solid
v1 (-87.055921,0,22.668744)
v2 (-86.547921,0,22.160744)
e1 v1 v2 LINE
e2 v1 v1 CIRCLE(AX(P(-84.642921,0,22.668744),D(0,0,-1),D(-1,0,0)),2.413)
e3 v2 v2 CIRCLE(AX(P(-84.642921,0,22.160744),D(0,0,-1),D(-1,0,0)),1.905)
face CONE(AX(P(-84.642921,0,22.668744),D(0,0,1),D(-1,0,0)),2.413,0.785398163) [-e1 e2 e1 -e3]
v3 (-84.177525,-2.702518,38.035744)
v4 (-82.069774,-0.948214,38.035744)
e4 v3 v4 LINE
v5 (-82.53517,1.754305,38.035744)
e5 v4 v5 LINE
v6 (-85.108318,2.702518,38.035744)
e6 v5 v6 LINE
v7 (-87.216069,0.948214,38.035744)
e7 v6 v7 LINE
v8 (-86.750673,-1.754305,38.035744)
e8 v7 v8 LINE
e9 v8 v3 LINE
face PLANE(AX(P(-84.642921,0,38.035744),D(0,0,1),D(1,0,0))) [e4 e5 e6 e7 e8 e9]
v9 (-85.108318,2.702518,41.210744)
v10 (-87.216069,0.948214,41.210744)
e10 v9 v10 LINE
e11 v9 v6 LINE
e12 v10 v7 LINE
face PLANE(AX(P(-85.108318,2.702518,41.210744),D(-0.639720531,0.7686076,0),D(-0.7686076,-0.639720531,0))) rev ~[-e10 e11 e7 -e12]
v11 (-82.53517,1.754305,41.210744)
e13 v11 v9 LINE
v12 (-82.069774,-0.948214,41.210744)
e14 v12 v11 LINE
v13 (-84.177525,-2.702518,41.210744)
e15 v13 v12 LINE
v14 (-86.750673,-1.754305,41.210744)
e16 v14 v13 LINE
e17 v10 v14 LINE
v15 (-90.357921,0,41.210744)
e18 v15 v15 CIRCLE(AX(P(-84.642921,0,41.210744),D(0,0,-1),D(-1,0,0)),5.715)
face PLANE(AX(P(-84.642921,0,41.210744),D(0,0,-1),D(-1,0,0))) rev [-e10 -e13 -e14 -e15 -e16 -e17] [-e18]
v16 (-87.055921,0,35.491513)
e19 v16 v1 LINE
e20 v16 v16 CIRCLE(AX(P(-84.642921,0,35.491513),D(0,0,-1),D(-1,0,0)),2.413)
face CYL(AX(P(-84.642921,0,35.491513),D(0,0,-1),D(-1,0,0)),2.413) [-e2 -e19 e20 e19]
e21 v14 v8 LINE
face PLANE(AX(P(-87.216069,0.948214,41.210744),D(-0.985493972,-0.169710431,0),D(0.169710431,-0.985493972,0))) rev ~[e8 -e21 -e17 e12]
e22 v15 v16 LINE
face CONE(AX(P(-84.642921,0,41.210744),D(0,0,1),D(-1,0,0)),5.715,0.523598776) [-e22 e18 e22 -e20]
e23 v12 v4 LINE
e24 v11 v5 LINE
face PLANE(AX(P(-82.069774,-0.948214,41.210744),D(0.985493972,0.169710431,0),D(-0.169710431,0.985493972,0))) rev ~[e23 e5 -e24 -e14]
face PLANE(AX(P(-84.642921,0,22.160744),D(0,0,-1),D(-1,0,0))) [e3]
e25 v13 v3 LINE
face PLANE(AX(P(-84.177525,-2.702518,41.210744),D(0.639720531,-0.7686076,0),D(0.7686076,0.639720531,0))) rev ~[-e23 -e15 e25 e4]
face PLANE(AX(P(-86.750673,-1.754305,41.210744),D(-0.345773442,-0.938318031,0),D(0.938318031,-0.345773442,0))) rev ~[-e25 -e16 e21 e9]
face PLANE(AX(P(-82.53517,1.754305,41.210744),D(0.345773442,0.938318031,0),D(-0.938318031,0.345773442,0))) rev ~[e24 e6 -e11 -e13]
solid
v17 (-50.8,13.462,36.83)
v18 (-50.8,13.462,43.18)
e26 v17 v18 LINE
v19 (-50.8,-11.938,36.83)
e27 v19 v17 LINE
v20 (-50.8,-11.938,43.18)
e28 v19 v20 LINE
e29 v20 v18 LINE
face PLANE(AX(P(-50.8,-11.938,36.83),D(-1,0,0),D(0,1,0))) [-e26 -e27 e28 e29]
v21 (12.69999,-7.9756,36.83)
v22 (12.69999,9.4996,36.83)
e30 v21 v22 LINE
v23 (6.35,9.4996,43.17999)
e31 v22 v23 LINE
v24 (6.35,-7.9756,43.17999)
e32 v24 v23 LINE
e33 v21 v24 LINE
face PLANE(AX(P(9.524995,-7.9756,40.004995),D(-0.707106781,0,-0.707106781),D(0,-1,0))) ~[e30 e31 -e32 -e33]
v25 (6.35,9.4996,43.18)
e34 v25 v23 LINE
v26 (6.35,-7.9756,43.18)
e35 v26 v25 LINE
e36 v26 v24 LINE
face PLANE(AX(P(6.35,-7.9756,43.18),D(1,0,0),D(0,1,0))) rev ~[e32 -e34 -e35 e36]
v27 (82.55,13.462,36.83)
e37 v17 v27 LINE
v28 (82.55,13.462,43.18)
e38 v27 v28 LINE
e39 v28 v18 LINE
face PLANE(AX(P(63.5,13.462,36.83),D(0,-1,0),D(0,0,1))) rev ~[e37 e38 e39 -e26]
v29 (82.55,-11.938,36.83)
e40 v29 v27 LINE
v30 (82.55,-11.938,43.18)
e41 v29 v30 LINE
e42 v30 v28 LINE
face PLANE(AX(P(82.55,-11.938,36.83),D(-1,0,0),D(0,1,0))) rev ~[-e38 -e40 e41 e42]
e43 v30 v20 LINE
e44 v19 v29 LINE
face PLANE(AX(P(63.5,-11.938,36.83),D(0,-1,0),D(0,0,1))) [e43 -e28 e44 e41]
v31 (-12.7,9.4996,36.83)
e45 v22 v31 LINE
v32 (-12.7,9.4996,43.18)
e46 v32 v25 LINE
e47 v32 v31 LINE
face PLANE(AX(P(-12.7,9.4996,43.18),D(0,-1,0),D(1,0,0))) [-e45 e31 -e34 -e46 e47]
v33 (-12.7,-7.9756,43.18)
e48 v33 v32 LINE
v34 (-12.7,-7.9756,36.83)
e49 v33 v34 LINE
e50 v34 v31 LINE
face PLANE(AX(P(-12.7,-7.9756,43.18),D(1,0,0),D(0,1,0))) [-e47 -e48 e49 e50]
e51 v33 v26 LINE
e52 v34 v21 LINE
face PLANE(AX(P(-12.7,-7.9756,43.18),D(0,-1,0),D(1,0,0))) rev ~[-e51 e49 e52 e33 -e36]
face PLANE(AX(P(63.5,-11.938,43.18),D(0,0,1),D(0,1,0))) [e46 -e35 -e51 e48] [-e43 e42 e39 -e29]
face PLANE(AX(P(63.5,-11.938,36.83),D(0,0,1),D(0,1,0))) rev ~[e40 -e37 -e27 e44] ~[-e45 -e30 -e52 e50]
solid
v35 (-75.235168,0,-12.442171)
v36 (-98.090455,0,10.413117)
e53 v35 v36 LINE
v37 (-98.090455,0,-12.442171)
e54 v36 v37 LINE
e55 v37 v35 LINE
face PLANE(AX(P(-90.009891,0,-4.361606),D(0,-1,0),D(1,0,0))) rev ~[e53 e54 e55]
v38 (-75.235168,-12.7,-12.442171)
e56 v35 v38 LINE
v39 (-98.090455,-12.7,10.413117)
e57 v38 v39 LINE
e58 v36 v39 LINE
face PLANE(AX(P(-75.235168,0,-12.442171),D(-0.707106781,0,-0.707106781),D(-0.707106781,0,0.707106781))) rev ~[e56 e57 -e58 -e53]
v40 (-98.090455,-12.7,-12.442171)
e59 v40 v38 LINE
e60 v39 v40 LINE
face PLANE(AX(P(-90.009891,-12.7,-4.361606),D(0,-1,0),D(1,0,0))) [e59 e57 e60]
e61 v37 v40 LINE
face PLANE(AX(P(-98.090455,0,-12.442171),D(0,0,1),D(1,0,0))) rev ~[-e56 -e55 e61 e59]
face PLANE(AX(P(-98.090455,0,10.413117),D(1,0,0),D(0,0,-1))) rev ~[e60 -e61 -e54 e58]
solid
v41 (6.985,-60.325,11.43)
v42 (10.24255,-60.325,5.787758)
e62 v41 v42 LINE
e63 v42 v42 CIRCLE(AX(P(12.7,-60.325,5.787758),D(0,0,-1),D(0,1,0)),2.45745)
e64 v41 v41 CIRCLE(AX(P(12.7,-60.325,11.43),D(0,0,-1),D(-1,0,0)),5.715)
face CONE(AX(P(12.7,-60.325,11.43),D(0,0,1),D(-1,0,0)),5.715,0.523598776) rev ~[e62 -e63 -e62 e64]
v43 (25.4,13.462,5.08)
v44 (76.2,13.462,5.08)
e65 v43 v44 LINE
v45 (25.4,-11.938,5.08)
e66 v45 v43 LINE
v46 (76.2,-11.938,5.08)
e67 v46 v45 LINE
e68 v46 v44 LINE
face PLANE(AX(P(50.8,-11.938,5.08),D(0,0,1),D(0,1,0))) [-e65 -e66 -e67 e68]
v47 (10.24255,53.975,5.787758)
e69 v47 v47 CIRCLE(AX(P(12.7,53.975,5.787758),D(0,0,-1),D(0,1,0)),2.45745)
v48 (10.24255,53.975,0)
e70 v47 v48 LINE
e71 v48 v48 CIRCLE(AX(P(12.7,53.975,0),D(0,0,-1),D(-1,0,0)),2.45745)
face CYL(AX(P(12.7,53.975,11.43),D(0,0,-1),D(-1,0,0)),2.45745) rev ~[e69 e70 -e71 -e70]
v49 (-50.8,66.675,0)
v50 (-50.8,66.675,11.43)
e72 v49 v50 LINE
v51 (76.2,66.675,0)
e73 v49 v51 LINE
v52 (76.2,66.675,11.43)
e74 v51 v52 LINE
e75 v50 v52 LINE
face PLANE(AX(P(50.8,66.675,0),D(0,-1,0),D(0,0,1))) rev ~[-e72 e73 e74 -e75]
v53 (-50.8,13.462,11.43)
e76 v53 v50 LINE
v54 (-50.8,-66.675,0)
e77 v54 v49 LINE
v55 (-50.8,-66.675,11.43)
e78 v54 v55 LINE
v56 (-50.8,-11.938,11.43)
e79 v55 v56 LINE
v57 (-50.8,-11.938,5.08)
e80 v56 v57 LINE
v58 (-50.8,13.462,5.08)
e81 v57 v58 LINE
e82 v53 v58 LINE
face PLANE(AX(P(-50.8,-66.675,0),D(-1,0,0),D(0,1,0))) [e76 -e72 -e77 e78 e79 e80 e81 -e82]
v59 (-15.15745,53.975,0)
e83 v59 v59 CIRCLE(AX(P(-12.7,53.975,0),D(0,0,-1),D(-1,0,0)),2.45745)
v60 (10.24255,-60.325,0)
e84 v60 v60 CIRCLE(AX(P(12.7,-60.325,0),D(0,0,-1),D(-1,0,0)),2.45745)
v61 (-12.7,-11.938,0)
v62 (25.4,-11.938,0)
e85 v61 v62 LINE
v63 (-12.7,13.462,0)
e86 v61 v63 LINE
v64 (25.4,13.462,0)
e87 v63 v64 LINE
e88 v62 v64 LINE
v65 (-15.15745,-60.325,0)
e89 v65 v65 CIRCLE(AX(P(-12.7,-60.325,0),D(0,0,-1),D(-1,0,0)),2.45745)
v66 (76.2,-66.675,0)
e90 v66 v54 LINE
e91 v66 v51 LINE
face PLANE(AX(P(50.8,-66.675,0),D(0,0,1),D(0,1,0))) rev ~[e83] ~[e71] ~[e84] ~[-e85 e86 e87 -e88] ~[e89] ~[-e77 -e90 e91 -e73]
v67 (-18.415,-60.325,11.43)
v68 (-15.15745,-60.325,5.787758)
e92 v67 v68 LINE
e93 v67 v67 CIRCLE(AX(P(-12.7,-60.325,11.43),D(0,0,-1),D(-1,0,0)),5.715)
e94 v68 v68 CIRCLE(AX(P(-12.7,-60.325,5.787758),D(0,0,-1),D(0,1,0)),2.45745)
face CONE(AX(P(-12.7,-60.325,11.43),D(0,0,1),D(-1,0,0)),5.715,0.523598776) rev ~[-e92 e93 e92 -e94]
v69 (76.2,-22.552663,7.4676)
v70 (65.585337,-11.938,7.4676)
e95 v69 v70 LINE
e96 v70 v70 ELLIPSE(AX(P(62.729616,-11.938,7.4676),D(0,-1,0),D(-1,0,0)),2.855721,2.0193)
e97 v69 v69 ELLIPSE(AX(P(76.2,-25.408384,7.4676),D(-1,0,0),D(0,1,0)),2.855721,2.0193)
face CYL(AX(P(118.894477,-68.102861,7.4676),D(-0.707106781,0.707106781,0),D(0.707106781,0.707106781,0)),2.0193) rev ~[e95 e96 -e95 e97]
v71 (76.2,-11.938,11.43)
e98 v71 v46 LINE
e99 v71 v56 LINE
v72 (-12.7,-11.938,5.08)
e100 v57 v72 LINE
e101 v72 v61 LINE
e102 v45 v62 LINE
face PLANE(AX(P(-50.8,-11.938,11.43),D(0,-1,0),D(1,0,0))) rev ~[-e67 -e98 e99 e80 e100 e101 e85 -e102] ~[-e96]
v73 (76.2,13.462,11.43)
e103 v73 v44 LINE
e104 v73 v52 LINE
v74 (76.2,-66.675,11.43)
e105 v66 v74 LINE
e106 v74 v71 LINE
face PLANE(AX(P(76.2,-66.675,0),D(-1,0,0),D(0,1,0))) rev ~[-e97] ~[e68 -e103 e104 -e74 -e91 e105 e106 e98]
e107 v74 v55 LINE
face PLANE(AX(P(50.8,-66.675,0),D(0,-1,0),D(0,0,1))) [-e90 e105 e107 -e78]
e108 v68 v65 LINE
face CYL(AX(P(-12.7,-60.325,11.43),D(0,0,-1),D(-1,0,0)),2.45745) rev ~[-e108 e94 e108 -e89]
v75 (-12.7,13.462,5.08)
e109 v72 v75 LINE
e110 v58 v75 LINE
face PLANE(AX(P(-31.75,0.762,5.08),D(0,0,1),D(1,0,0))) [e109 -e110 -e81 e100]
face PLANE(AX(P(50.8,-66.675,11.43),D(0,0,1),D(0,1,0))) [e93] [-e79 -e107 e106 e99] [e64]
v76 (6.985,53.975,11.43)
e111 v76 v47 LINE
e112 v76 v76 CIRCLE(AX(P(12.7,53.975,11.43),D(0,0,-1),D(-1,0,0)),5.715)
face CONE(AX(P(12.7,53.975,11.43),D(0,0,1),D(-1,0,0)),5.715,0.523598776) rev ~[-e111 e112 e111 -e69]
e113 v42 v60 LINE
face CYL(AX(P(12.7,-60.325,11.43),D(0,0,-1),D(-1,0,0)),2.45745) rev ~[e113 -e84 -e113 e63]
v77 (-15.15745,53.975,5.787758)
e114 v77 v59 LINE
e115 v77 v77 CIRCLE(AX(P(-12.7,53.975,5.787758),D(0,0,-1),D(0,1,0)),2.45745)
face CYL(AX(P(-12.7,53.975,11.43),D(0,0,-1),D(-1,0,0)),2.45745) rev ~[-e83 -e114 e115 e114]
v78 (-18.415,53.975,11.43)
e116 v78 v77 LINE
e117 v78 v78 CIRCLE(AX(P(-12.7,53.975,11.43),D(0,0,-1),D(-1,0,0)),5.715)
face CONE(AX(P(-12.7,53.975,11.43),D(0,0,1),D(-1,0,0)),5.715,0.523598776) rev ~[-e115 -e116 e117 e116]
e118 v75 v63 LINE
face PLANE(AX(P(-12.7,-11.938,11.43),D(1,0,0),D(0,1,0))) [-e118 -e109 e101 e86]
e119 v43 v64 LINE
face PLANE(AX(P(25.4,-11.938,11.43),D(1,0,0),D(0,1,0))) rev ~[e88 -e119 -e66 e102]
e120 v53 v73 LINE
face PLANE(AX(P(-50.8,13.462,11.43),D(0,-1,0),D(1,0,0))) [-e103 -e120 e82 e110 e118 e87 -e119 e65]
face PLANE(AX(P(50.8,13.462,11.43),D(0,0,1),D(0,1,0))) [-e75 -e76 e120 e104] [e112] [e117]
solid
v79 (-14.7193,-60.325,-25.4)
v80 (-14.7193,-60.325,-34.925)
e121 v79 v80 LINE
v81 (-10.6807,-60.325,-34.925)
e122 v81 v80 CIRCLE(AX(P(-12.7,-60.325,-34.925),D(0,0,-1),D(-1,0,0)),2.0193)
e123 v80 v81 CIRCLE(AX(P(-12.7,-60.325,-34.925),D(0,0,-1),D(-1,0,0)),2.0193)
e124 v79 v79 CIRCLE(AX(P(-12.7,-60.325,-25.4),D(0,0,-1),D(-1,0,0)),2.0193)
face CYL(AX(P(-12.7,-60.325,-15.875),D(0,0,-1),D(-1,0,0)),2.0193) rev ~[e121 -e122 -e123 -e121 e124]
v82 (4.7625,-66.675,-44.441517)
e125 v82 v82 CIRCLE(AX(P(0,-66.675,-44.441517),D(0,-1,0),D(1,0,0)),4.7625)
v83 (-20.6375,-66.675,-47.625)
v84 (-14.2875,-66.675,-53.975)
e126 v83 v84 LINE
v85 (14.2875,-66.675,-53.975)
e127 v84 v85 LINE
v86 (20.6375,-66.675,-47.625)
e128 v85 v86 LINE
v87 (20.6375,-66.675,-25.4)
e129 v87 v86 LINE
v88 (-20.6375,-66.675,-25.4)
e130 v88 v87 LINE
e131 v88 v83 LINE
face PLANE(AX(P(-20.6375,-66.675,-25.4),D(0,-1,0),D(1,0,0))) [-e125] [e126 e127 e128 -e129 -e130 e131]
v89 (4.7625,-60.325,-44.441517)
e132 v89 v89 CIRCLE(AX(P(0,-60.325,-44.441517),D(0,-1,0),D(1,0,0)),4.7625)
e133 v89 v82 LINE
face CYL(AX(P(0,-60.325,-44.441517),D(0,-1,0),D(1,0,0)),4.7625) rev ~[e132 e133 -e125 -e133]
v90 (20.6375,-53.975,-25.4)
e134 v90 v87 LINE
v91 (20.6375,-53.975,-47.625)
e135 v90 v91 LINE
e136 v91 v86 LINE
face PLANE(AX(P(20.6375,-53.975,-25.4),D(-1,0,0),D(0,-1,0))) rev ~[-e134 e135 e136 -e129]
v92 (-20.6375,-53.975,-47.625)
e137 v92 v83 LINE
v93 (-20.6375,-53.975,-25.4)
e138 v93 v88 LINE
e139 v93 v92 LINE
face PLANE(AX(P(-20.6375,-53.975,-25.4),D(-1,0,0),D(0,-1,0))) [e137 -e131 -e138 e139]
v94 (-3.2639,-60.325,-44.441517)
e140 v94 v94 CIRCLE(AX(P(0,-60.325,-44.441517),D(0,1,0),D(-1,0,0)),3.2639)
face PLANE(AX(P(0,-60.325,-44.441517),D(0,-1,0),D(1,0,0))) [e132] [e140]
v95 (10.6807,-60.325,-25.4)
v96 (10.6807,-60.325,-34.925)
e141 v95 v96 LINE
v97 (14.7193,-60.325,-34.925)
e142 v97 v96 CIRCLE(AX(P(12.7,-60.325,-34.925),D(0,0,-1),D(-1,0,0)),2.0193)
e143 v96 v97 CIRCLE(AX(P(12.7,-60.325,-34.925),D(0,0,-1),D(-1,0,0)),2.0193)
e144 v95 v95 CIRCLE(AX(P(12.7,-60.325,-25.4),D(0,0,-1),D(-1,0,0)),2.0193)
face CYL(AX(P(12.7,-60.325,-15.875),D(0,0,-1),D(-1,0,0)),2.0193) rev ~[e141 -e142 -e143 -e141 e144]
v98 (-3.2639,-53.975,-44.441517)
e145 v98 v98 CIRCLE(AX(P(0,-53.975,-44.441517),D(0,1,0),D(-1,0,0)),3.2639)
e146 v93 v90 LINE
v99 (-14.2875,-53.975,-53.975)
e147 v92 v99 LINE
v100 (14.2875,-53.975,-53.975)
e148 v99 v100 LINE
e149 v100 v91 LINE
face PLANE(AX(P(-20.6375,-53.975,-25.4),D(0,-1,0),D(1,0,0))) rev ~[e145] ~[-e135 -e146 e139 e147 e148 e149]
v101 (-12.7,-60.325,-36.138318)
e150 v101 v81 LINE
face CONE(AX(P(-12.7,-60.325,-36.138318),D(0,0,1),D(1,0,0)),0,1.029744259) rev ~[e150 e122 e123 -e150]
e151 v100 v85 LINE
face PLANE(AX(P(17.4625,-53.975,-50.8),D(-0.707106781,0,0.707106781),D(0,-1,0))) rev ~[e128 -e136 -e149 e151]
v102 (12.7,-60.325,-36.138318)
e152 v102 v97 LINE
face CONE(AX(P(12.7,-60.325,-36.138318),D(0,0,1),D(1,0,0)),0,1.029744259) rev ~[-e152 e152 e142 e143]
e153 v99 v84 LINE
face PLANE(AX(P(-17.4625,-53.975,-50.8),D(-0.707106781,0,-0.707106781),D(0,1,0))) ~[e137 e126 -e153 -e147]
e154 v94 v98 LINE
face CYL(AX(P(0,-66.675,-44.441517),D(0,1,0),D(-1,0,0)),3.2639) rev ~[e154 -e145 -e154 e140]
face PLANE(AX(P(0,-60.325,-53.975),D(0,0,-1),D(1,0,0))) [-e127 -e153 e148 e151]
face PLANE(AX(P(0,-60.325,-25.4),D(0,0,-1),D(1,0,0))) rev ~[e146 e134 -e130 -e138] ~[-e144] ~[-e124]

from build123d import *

# Parameters (mm, degrees)
F0_W            = 101.6
F0_H            = 133.35
F1_DEPTH        = 11.43
F3_D            = 4.9149
F3_CSINK_D      = 11.43
F3_CSINK_ANGLE  = 60
F5_W            = 41.275
F5_H            = 12.7
F6_DEPTH        = 28.575
F8_D            = 4.0386
F8_DEPTH        = 9.525
F8_TIP          = 1.213317848
F10_D           = 6.5278
F10_CBORE_D     = 9.525
F10_CBORE_DEPTH = 6.35
F11_W           = 38.1
F11_H           = 25.4
F11_W_2         = 25.4
F12_DEPTH       = 6.35
F13_DEPTH       = 65.406
F15_W           = 101.6
F15_H           = 25.4
F16_DEPTH       = 6.35
F17_W           = 19.05
F17_H           = 17.4752
F18_DEPTH       = 97.156
F20_DEPTH       = 12.7
F21_SIZE2       = 6.34999
F21_SIZE        = 6.34999
F22_DEPTH       = 12.7
F23_DEPTH       = 25.4
F24_DEPTH       = 19.05
F25_SIZE        = 6.35
F28_D           = 4.0386
F28_DEPTH       = 25.4
F28_START       = 31.1992039
F28_TIP         = 1.213317848
F31_SIZE        = 0.508
F33_DEPTH       = 3.175


# Not quite as in the source:
# - a fillet or chamfer is up to 0.001 mm smaller than in the source, because OpenCascade refuses the exact size


with BuildPart() as f1:
    # F0 (on Top) → F1 (new body)
    with BuildSketch(Plane.XY):
        Rectangle(F0_W, F0_H)
    extrude(amount=F1_DEPTH)

    # F3 (through all)
    with Locations(Plane.XY.offset(11.43)):
        with Locations((-12.7, 53.975), (12.7, 53.975), (-12.7, -60.325), (12.7, -60.325)):
            CounterSinkHole(F3_D / 2, F3_CSINK_D / 2, counter_sink_angle=F3_CSINK_ANGLE)

    # F11 (on face) → F12 (cut)
    with BuildSketch(Plane.XY.offset(11.43)):
        with Locations((-31.75, 0.762)):
            Rectangle(F11_W, F11_H)
        with Locations((38.1, 0.762)):
            Rectangle(F11_W_2, F11_H)
    extrude(amount=-F12_DEPTH, mode=Mode.SUBTRACT)

    # F11 (on face) → F13 (cut, through all)
    with BuildSketch(Plane.XY.offset(11.43)):
        with Locations((6.35, 0.762)):
            Rectangle(F11_W, F11_H)
    extrude(amount=-F13_DEPTH, mode=Mode.SUBTRACT)

    # F23 (add): a face of the model
    f23_faces = [f1.faces().sort_by_distance(p)[0] for p in [
        (50.8, 0, 1.338389607),
    ]]
    extrude(f23_faces, amount=F23_DEPTH)

    # F28
    # its depths count from where the whole tool has entered the part; down to there all is cleared
    with Locations(Plane(origin=(71.4375, -71.4375, 0), x_dir=(-0.7071067812, -0.7071067812, 0), z_dir=(0.7071067812, -0.7071067812, 0))):
        with Locations((-35.9150959726, -7.4676)):
            Hole(F28_D / 2, depth=F28_START)
    with Locations(Plane(origin=(71.4375, -71.4375, 0), x_dir=(-0.7071067812, -0.7071067812, 0), z_dir=(0.7071067812, -0.7071067812, 0)).offset(-F28_START)):
        with Locations((-35.9150959726, -7.4676)):
            Hole(F28_D / 2, depth=F28_DEPTH)
            with Locations((0, 0, -(F28_DEPTH + F28_TIP / 2))):  # 118° drill point
                Cone(0, F28_D / 2, F28_TIP, mode=Mode.SUBTRACT)


with BuildPart() as f6:
    # F5 (on offset) → F6 (new body)
    with BuildSketch(Plane(origin=(0, 0, -25.4), x_dir=(1, 0, 0), z_dir=(0, 0, -1))):
        with Locations((0, 60.325)):
            Rectangle(F5_W, F5_H)
    extrude(amount=F6_DEPTH)

    # F8
    with Locations(Plane.XY.offset(-25.4)):
        with Locations((-12.7, -60.325), (12.7, -60.325)):
            Hole(F8_D / 2, depth=F8_DEPTH)
            with Locations((0, 0, -(F8_DEPTH + F8_TIP / 2))):  # 118° drill point
                Cone(0, F8_D / 2, F8_TIP, mode=Mode.SUBTRACT)

    # F10 (through all)
    with Locations(Plane.XZ.offset(66.675)):
        with Locations((0, -44.4415174425)):
            CounterBoreHole(F10_D / 2, F10_CBORE_D / 2, F10_CBORE_DEPTH)

    # F25
    f25_edges = [f6.edges().sort_by_distance(p)[0] for p in [
        (-20.6375, -60.325, -53.975),
        (20.6375, -60.325, -53.975),
    ]]
    chamfer(f25_edges, length=F25_SIZE)


with BuildPart() as f16:
    # F15 (on offset) → F16 (new body)
    with BuildSketch(Plane.XY.offset(36.83)):
        with Locations((0, 0.762)):
            Rectangle(F15_W, F15_H)
    extrude(amount=F16_DEPTH)

    # F17 (on face) → F18 (cut, through all)
    with BuildSketch(Plane.XY.offset(43.18)):
        with Locations((-3.175, 0.762)):
            Rectangle(F17_W, F17_H)
    extrude(amount=-F18_DEPTH, mode=Mode.SUBTRACT)

    # F21 (size 6.35 and 6.35 in the source; OpenCascade refuses exactly that, so slightly less here)
    f21_edges = [f16.edges().sort_by_distance(p)[0] for p in [
        (6.35, 0.762, 36.83),
    ]]
    chamfer(f21_edges, length=F21_SIZE, length2=F21_SIZE2)

    # F22 (add): a face of the model
    f22_faces = [f16.faces().sort_by_distance(p)[0] for p in [
        (50.8, 0.762, 40.005),
    ]]
    extrude(f22_faces, amount=F22_DEPTH)

    # F24 (add): a face of the model
    f24_faces = [f16.faces().sort_by_distance(p)[0] for p in [
        (63.5, 0.762, 40.005),
    ]]
    extrude(f24_faces, amount=F24_DEPTH)


with BuildPart() as f20:
    # F19 (on Front) → F20 (new body)
    with BuildSketch(Plane.XZ):
        Polygon((-75.2351675029, -12.4421706577), (-98.090454936, 10.4131167755), (-98.090454936, -12.4421706577), align=None)
    extrude(amount=F20_DEPTH)


with BuildPart() as f30:
    # F29 (on Front) → F30 (revolve)
    with BuildSketch(Plane.XZ):
        Polygon((-84.6429214931, 41.2107444957), (-90.3579214931, 41.2107444957), (-87.0559214931, 35.4915127291), (-87.0559214931, 22.1607444957), (-84.6429214931, 22.1607444957), align=None)
    revolve(axis=Axis((-84.6429214931, 0, 31.6857444957), (0, 0, -1)))

    # F31
    f31_edges = [f30.edges().sort_by_distance(p)[0] for p in [
        (-82.229921, 0, 22.160744),
    ]]
    chamfer(f31_edges, length=F31_SIZE)

    # F32 (on face) → F33 (cut)
    with BuildSketch(Plane.XY.offset(41.2107444957)):
        Polygon((-84.1775248652, -2.7025184536), (-82.0697735441, -0.9482139242), (-82.535170172, 1.7543045294), (-85.1083181209, 2.7025184536), (-87.216069442, 0.9482139242), (-86.7506728141, -1.7543045294), align=None)
    extrude(amount=-F33_DEPTH, mode=Mode.SUBTRACT)


solid = Compound([f1.part, f6.part, f16.part, f20.part, f30.part])
